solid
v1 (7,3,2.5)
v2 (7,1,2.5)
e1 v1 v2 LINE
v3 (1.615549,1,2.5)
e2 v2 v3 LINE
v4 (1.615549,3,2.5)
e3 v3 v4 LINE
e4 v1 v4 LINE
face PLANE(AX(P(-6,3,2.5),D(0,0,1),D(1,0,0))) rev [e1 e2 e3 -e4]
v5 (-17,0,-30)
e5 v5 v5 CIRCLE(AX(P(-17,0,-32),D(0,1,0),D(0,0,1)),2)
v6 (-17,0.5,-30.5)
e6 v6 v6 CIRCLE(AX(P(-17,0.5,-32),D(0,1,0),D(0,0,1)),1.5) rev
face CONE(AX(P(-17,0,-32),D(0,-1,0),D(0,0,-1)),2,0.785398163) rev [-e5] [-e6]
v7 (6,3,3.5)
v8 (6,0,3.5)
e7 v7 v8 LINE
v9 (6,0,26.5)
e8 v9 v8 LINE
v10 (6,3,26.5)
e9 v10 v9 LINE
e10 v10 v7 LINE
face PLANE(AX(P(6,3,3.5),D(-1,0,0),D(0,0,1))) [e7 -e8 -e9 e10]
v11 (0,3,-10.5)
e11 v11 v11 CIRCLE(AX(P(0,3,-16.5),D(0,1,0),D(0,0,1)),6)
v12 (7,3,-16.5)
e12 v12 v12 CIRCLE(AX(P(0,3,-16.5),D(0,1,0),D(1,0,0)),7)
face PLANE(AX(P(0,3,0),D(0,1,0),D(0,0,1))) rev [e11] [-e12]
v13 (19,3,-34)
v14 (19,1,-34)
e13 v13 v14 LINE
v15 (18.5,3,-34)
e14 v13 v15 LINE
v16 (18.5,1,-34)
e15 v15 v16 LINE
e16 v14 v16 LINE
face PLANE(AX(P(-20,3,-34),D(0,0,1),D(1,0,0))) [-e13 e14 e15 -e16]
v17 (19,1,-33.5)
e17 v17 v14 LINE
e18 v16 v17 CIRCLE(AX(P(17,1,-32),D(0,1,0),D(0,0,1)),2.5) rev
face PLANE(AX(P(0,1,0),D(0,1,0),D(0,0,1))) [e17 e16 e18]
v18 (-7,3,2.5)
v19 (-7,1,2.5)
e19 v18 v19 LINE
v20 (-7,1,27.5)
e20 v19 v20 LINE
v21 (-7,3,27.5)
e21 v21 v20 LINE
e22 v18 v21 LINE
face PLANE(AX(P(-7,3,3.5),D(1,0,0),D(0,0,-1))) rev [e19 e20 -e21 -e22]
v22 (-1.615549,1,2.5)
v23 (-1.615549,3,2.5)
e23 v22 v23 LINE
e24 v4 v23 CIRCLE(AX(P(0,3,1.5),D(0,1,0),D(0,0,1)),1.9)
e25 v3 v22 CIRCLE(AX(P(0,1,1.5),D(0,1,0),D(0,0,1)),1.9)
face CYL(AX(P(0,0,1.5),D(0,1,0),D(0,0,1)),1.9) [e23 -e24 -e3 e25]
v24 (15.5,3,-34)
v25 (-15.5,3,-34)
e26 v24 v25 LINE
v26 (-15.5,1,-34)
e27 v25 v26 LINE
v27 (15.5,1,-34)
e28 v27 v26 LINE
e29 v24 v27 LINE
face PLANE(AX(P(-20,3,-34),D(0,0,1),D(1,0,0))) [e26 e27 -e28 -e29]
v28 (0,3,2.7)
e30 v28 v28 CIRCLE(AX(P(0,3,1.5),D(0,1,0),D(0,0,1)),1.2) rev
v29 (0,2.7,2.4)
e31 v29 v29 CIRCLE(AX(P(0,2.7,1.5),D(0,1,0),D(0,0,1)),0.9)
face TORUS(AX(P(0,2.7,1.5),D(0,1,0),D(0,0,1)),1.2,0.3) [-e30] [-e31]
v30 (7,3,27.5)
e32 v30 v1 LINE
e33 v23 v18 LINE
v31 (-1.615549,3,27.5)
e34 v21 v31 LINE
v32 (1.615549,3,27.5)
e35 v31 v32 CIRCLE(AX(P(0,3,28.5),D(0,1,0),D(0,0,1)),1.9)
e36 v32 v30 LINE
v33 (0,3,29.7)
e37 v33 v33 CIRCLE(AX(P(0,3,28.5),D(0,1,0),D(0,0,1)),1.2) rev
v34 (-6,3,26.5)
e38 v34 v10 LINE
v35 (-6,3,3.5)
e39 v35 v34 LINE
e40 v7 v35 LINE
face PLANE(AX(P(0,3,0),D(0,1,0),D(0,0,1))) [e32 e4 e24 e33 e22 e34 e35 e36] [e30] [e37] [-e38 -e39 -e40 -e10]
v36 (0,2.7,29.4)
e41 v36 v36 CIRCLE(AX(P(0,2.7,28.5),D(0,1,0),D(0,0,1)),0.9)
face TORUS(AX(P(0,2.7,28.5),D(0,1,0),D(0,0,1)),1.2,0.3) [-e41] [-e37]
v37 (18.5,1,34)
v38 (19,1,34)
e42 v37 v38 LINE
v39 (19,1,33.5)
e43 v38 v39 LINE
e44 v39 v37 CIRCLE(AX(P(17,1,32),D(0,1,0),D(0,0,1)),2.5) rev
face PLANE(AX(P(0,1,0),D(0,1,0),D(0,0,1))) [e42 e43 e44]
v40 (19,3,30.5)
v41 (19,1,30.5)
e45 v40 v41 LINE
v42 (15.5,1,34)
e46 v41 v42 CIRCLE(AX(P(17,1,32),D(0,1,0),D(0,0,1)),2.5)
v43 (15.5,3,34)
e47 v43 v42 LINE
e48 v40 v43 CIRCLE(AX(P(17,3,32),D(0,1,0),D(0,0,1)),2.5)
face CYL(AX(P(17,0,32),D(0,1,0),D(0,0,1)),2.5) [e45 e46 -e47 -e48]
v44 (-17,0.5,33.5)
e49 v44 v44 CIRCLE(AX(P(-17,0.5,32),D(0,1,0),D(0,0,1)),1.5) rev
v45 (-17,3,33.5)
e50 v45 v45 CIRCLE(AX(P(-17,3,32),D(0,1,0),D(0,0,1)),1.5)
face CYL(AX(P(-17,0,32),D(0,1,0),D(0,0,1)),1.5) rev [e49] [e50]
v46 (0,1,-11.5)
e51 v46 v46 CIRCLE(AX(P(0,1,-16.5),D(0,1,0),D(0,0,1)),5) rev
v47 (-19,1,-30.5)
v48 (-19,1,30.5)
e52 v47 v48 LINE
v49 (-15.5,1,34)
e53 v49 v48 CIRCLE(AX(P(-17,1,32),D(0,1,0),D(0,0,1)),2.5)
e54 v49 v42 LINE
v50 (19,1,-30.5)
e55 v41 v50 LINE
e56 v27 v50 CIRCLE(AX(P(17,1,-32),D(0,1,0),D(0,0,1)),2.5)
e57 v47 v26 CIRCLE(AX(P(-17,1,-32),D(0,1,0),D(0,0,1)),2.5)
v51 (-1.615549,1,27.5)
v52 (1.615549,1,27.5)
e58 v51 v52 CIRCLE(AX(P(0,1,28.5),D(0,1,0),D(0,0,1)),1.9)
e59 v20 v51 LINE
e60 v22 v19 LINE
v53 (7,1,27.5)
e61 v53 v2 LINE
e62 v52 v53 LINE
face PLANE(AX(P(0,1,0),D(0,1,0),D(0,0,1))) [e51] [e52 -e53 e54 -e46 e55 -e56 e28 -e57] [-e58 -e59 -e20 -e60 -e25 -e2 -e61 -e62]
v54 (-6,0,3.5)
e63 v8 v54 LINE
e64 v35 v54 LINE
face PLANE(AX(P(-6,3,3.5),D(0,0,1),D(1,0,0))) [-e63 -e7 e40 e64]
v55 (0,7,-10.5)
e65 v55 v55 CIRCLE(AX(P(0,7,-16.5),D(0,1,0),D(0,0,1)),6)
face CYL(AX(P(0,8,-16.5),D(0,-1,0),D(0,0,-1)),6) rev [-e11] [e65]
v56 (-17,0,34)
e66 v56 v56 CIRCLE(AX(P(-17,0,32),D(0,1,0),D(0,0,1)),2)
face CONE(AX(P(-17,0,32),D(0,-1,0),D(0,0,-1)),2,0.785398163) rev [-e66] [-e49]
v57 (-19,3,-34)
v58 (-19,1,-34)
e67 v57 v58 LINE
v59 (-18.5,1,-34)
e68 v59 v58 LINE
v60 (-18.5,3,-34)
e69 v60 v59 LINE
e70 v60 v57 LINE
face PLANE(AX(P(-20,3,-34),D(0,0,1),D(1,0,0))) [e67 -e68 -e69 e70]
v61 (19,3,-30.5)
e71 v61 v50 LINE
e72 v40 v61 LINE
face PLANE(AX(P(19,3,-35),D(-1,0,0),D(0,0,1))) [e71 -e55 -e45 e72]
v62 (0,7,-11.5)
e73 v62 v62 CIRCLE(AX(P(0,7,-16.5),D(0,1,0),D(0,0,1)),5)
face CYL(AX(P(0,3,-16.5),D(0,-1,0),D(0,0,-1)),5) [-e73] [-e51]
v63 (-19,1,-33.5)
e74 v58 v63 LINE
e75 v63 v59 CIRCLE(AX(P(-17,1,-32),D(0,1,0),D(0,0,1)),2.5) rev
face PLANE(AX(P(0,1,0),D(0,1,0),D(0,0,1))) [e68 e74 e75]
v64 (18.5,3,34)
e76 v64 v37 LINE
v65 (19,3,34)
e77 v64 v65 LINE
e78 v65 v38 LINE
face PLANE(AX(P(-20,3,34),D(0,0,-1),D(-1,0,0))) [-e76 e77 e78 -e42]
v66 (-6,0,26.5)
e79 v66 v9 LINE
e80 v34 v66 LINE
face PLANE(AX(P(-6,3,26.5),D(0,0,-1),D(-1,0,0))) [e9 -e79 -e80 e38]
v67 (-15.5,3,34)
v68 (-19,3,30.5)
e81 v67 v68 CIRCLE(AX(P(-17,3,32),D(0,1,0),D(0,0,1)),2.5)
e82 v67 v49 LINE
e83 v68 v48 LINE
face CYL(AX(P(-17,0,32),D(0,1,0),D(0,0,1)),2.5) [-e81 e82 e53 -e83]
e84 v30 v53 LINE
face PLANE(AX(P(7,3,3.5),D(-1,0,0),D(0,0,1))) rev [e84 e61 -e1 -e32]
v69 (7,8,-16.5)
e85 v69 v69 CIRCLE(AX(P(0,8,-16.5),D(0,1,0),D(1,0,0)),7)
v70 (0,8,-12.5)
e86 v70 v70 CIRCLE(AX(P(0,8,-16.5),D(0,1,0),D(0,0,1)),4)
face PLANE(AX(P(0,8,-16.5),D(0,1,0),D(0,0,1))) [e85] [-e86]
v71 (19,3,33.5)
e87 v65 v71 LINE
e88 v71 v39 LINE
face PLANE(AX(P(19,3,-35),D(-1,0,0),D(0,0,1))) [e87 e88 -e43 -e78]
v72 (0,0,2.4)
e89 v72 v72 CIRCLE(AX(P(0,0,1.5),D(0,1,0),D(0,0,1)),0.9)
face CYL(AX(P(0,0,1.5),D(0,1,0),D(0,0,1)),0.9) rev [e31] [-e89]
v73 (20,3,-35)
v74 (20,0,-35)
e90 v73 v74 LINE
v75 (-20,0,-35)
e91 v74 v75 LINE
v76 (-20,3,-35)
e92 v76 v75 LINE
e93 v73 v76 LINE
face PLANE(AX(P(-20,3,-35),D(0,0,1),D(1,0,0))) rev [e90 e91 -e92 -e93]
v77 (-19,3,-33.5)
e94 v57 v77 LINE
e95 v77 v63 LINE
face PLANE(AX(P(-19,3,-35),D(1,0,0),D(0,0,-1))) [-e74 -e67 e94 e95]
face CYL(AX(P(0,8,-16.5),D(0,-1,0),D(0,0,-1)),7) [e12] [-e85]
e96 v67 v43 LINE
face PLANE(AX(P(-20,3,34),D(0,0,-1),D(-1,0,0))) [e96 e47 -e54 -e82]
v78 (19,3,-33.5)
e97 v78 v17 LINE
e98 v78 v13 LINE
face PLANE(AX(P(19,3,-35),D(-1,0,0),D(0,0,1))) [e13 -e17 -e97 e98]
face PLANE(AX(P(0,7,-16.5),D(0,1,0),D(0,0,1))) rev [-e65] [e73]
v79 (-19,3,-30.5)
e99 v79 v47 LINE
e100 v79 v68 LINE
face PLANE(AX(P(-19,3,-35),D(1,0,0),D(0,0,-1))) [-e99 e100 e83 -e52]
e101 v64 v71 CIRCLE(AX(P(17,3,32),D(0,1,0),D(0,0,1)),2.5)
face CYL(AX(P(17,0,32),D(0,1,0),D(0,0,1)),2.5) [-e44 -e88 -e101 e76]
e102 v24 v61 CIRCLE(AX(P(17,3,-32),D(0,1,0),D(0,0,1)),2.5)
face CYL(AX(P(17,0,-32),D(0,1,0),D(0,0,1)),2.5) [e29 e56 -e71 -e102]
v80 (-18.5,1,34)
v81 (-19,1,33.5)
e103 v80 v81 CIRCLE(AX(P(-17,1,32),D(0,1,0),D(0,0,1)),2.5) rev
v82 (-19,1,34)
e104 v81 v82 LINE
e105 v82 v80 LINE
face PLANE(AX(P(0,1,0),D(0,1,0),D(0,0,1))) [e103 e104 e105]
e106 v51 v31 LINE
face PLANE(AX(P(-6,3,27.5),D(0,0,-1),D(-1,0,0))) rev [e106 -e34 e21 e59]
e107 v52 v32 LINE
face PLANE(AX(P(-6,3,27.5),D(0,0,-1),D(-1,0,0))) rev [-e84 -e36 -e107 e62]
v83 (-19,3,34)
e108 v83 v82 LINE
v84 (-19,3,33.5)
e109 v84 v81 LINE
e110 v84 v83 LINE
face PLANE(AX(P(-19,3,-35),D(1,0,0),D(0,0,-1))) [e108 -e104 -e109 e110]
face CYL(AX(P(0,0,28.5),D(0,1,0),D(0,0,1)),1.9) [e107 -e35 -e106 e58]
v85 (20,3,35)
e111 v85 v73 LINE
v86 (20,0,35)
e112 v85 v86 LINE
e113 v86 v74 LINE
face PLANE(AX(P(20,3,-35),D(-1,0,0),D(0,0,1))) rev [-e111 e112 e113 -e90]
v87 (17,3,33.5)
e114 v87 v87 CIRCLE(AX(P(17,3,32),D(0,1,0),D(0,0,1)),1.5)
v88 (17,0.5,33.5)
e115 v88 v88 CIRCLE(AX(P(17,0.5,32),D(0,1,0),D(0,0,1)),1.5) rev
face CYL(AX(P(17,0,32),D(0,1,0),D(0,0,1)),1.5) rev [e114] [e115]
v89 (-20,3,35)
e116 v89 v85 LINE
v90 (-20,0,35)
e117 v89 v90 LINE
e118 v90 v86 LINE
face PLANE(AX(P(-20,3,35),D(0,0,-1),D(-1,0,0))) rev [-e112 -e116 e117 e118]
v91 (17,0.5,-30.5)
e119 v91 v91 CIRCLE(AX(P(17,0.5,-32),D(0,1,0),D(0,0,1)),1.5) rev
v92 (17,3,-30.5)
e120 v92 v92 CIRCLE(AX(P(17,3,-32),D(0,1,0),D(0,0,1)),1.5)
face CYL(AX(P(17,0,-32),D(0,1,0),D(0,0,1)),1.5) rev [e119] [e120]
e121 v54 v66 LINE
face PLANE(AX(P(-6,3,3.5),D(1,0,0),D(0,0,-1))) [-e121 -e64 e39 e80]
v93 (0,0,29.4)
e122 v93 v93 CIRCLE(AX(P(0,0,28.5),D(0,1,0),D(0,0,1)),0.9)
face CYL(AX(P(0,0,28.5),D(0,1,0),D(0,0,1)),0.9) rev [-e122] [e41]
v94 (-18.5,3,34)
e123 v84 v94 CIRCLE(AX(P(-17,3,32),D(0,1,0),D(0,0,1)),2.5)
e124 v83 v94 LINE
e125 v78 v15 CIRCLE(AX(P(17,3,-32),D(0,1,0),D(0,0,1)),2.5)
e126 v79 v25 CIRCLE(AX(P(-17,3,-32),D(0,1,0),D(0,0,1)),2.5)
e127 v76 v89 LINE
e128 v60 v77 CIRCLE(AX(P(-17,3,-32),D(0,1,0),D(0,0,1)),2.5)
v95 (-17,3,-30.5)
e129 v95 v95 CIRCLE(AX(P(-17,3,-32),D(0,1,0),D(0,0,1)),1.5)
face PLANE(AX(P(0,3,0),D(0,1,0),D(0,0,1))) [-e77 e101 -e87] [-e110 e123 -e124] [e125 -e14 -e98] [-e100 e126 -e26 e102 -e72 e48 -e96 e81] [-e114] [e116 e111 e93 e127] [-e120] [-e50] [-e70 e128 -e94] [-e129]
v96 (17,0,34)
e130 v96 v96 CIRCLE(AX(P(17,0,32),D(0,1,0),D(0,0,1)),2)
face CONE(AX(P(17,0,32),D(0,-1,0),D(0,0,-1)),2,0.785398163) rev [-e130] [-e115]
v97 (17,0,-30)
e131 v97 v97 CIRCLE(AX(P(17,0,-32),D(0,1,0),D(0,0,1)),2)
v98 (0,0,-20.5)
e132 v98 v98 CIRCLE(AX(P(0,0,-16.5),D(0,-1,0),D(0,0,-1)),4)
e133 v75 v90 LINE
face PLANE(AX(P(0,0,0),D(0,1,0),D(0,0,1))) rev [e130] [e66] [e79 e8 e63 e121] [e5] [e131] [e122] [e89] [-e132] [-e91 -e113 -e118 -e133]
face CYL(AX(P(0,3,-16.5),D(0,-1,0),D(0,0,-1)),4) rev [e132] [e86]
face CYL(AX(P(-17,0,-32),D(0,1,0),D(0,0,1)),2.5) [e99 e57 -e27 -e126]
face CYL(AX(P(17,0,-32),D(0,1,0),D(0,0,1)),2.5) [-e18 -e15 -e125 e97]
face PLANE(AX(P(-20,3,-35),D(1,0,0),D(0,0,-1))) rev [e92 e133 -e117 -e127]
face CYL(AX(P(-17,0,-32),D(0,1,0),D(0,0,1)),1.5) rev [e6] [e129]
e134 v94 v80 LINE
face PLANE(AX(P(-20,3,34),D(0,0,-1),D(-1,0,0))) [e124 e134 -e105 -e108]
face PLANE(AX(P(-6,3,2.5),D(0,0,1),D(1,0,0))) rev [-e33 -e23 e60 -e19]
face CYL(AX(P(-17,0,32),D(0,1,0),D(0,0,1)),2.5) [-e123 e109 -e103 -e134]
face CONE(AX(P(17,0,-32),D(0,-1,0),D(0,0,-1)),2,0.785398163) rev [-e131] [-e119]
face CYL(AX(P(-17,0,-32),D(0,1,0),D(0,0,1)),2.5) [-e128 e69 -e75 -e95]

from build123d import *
from build123d.topology import SkipClean

# Parameters (mm, degrees)
SKETCH_1_W            = 40
SKETCH_1_H            = 70
SKETCH_1_W_2          = 12
SKETCH_1_H_2          = 23
EXTRUDE_1_DEPTH       = 3
SKETCH_2_R            = 0.9
CUT_EXTRUDE_1_DEPTH   = 3
SKETCH_3_R            = 1.5
CUT_EXTRUDE_2_DEPTH   = 41.422765863
CHAMFER_1_SIZE        = 0.5
FILLET_1_R            = 0.3
SKETCH_4_R            = 4
CUT_EXTRUDE_3_DEPTH   = 41.422765863
SKETCH_6_R            = 7
SKETCH_6_R_2          = 4
EXTRUDE_1_2_DEPTH     = 5
SHELL_START           = 1
SHELL_1_OUTLINE_R     = 5
SHELL_1_DEPTH         = 2
SHELL_START_2         = 3
SHELL_1_2_OUTLINE_R   = 6
SHELL_1_2_OUTLINE_R_2 = 5
SHELL_1_2_DEPTH       = 4


# Read off the part's stored shape, not the designer's step: 抽壳1
with BuildPart() as part:
    # 草图1 → Extrude 1 (new body)
    with BuildSketch(Plane(origin=(0, 0, 0), x_dir=(1, 0, 0), z_dir=(0, 1, 0))):
        Rectangle(SKETCH_1_W, SKETCH_1_H)
        with Locations((0, -15)):
            Rectangle(SKETCH_1_W_2, SKETCH_1_H_2, mode=Mode.SUBTRACT)
    extrude(amount=EXTRUDE_1_DEPTH)

    # 草图2 → 切除-拉伸1 (cut)
    with BuildSketch(Plane(origin=(0, 3, 0), x_dir=(1, 0, 0), z_dir=(0, 1, 0))):
        with Locations(Location((0, -28.5, 0), (0, 0, 270))):
            Circle(SKETCH_2_R)
        with Locations(Location((0, -1.5, 0), (0, 0, 270))):
            Circle(SKETCH_2_R)
    extrude(amount=-CUT_EXTRUDE_1_DEPTH, mode=Mode.SUBTRACT)

    # 草图3 → 切除-拉伸2 (cut, through all)
    with BuildSketch(Plane(origin=(0, 3, 0), x_dir=(1, 0, 0), z_dir=(0, 1, 0))):
        with Locations(Location((-17, 32, 0), (0, 0, 270))):
            Circle(SKETCH_3_R)
        with Locations(Location((17, 32, 0), (0, 0, 270))):
            Circle(SKETCH_3_R)
        with Locations(Location((-17, -32, 0), (0, 0, 270))):
            Circle(SKETCH_3_R)
        with Locations(Location((17, -32, 0), (0, 0, 270))):
            Circle(SKETCH_3_R)
    extrude(amount=-CUT_EXTRUDE_2_DEPTH, mode=Mode.SUBTRACT)

    # 倒角1
    chamfer_1_edges = [part.edges().sort_by_distance(p)[0] for p in [
        (17, 0, -33.5),
        (-17, 0, 30.5),
        (17, 0, 30.5),
        (-17, 0, -33.5),
    ]]
    chamfer(chamfer_1_edges, length=CHAMFER_1_SIZE)

    # 圆角1
    fillet_1_edges = [part.edges().sort_by_distance(p)[0] for p in [
        (0, 3, 27.6),
        (0, 3, 0.6),
    ]]
    fillet(fillet_1_edges, radius=FILLET_1_R)

    # 草图4 → 切除-拉伸3 (cut, through all)
    with BuildSketch(Plane.XZ):
        with Locations(Location((0, -16.5, 0), (0, 0, 270))):
            Circle(SKETCH_4_R)
    extrude(amount=-CUT_EXTRUDE_3_DEPTH, mode=Mode.SUBTRACT)

    # 草图6 → Extrude 1 2 (add)
    with SkipClean():  # the faces are left unmerged after this step: merging them gives an invalid solid
        with BuildSketch(Plane(origin=(0, 3, 0), x_dir=(1, 0, 0), z_dir=(0, 1, 0))):
            with Locations((0, 16.5)):
                Circle(SKETCH_6_R)
            with Locations((0, 16.5)):
                Circle(SKETCH_6_R_2, mode=Mode.SUBTRACT)
        extrude(amount=EXTRUDE_1_2_DEPTH)

    # 抽壳1 outline → 抽壳1 (cut)
    # profile 1 of 5: a face of its own
    with SkipClean():  # the faces are left unmerged after this step: merging them gives an invalid solid
        with BuildSketch(Plane(origin=(0, 0, 0), x_dir=(1, 0, 0), z_dir=(0, 1, 0)).offset(SHELL_START)):
            with BuildLine():
                ThreePointArc((-18.5, -34), (-18.767766953, -33.767766953), (-19, -33.5))
                Line((-19, -33.5), (-19, -34))
                Line((-19, -34), (-18.5, -34))
            make_face()
        # profile 2 of 5: a face of its own
        with BuildSketch(Plane(origin=(0, 0, 0), x_dir=(1, 0, 0), z_dir=(0, 1, 0)).offset(SHELL_START)):
            with BuildLine():
                ThreePointArc((-19, -30.5), (-15.232233047, -30.232233047), (-15.5, -34))
                Line((-15.5, -34), (15.5, -34))
                ThreePointArc((15.5, -34), (15.232233047, -30.232233047), (19, -30.5))
                Line((19, -30.5), (19, 30.5))
                ThreePointArc((19, 30.5), (15.232233047, 30.232233047), (15.5, 34))
                Line((15.5, 34), (-15.5, 34))
                ThreePointArc((-15.5, 34), (-15.232233047, 30.232233047), (-19, 30.5))
                Line((-19, 30.5), (-19, -30.5))
            make_face()
            with BuildLine():
                ThreePointArc((1.615549442, -27.5), (0, -30.4), (-1.615549442, -27.5))
                Line((-1.615549442, -27.5), (-7, -27.5))
                Line((-7, -27.5), (-7, -2.5))
                Line((-7, -2.5), (-1.615549442, -2.5))
                ThreePointArc((-1.615549442, -2.5), (0, 0.4), (1.615549442, -2.5))
                Line((1.615549442, -2.5), (7, -2.5))
                Line((7, -2.5), (7, -27.5))
                Line((7, -27.5), (1.615549442, -27.5))
            make_face(mode=Mode.SUBTRACT)
            with Locations((0, 16.5)):
                Circle(SHELL_1_OUTLINE_R, mode=Mode.SUBTRACT)
        # profile 3 of 5: a face of its own
        with BuildSketch(Plane(origin=(0, 0, 0), x_dir=(1, 0, 0), z_dir=(0, 1, 0)).offset(SHELL_START)):
            with BuildLine():
                Line((-19, 34), (-19, 33.5))
                ThreePointArc((-19, 33.5), (-18.767766953, 33.767766953), (-18.5, 34))
                Line((-18.5, 34), (-19, 34))
            make_face()
        # profile 4 of 5: a face of its own
        with BuildSketch(Plane(origin=(0, 0, 0), x_dir=(1, 0, 0), z_dir=(0, 1, 0)).offset(SHELL_START)):
            with BuildLine():
                Line((18.5, -34), (19, -34))
                Line((19, -34), (19, -33.5))
                ThreePointArc((19, -33.5), (18.767766953, -33.767766953), (18.5, -34))
            make_face()
        # profile 5 of 5: a face of its own
        with BuildSketch(Plane(origin=(0, 0, 0), x_dir=(1, 0, 0), z_dir=(0, 1, 0)).offset(SHELL_START)):
            with BuildLine():
                Line((19, 34), (18.5, 34))
                ThreePointArc((18.5, 34), (18.767766953, 33.767766953), (19, 33.5))
                Line((19, 33.5), (19, 34))
            make_face()
        extrude(amount=SHELL_1_DEPTH, mode=Mode.SUBTRACT)

    # Shell 1 2 outline → Shell 1 2 (cut)
    with SkipClean():  # the faces are left unmerged after this step: merging them gives an invalid solid
        with BuildSketch(Plane(origin=(0, 0, 0), x_dir=(1, 0, 0), z_dir=(0, 1, 0)).offset(SHELL_START_2)):
            with Locations((0, 16.5)):
                Circle(SHELL_1_2_OUTLINE_R)
            with Locations((0, 16.5)):
                Circle(SHELL_1_2_OUTLINE_R_2, mode=Mode.SUBTRACT)
        extrude(amount=SHELL_1_2_DEPTH, mode=Mode.SUBTRACT)


solid = part.part
